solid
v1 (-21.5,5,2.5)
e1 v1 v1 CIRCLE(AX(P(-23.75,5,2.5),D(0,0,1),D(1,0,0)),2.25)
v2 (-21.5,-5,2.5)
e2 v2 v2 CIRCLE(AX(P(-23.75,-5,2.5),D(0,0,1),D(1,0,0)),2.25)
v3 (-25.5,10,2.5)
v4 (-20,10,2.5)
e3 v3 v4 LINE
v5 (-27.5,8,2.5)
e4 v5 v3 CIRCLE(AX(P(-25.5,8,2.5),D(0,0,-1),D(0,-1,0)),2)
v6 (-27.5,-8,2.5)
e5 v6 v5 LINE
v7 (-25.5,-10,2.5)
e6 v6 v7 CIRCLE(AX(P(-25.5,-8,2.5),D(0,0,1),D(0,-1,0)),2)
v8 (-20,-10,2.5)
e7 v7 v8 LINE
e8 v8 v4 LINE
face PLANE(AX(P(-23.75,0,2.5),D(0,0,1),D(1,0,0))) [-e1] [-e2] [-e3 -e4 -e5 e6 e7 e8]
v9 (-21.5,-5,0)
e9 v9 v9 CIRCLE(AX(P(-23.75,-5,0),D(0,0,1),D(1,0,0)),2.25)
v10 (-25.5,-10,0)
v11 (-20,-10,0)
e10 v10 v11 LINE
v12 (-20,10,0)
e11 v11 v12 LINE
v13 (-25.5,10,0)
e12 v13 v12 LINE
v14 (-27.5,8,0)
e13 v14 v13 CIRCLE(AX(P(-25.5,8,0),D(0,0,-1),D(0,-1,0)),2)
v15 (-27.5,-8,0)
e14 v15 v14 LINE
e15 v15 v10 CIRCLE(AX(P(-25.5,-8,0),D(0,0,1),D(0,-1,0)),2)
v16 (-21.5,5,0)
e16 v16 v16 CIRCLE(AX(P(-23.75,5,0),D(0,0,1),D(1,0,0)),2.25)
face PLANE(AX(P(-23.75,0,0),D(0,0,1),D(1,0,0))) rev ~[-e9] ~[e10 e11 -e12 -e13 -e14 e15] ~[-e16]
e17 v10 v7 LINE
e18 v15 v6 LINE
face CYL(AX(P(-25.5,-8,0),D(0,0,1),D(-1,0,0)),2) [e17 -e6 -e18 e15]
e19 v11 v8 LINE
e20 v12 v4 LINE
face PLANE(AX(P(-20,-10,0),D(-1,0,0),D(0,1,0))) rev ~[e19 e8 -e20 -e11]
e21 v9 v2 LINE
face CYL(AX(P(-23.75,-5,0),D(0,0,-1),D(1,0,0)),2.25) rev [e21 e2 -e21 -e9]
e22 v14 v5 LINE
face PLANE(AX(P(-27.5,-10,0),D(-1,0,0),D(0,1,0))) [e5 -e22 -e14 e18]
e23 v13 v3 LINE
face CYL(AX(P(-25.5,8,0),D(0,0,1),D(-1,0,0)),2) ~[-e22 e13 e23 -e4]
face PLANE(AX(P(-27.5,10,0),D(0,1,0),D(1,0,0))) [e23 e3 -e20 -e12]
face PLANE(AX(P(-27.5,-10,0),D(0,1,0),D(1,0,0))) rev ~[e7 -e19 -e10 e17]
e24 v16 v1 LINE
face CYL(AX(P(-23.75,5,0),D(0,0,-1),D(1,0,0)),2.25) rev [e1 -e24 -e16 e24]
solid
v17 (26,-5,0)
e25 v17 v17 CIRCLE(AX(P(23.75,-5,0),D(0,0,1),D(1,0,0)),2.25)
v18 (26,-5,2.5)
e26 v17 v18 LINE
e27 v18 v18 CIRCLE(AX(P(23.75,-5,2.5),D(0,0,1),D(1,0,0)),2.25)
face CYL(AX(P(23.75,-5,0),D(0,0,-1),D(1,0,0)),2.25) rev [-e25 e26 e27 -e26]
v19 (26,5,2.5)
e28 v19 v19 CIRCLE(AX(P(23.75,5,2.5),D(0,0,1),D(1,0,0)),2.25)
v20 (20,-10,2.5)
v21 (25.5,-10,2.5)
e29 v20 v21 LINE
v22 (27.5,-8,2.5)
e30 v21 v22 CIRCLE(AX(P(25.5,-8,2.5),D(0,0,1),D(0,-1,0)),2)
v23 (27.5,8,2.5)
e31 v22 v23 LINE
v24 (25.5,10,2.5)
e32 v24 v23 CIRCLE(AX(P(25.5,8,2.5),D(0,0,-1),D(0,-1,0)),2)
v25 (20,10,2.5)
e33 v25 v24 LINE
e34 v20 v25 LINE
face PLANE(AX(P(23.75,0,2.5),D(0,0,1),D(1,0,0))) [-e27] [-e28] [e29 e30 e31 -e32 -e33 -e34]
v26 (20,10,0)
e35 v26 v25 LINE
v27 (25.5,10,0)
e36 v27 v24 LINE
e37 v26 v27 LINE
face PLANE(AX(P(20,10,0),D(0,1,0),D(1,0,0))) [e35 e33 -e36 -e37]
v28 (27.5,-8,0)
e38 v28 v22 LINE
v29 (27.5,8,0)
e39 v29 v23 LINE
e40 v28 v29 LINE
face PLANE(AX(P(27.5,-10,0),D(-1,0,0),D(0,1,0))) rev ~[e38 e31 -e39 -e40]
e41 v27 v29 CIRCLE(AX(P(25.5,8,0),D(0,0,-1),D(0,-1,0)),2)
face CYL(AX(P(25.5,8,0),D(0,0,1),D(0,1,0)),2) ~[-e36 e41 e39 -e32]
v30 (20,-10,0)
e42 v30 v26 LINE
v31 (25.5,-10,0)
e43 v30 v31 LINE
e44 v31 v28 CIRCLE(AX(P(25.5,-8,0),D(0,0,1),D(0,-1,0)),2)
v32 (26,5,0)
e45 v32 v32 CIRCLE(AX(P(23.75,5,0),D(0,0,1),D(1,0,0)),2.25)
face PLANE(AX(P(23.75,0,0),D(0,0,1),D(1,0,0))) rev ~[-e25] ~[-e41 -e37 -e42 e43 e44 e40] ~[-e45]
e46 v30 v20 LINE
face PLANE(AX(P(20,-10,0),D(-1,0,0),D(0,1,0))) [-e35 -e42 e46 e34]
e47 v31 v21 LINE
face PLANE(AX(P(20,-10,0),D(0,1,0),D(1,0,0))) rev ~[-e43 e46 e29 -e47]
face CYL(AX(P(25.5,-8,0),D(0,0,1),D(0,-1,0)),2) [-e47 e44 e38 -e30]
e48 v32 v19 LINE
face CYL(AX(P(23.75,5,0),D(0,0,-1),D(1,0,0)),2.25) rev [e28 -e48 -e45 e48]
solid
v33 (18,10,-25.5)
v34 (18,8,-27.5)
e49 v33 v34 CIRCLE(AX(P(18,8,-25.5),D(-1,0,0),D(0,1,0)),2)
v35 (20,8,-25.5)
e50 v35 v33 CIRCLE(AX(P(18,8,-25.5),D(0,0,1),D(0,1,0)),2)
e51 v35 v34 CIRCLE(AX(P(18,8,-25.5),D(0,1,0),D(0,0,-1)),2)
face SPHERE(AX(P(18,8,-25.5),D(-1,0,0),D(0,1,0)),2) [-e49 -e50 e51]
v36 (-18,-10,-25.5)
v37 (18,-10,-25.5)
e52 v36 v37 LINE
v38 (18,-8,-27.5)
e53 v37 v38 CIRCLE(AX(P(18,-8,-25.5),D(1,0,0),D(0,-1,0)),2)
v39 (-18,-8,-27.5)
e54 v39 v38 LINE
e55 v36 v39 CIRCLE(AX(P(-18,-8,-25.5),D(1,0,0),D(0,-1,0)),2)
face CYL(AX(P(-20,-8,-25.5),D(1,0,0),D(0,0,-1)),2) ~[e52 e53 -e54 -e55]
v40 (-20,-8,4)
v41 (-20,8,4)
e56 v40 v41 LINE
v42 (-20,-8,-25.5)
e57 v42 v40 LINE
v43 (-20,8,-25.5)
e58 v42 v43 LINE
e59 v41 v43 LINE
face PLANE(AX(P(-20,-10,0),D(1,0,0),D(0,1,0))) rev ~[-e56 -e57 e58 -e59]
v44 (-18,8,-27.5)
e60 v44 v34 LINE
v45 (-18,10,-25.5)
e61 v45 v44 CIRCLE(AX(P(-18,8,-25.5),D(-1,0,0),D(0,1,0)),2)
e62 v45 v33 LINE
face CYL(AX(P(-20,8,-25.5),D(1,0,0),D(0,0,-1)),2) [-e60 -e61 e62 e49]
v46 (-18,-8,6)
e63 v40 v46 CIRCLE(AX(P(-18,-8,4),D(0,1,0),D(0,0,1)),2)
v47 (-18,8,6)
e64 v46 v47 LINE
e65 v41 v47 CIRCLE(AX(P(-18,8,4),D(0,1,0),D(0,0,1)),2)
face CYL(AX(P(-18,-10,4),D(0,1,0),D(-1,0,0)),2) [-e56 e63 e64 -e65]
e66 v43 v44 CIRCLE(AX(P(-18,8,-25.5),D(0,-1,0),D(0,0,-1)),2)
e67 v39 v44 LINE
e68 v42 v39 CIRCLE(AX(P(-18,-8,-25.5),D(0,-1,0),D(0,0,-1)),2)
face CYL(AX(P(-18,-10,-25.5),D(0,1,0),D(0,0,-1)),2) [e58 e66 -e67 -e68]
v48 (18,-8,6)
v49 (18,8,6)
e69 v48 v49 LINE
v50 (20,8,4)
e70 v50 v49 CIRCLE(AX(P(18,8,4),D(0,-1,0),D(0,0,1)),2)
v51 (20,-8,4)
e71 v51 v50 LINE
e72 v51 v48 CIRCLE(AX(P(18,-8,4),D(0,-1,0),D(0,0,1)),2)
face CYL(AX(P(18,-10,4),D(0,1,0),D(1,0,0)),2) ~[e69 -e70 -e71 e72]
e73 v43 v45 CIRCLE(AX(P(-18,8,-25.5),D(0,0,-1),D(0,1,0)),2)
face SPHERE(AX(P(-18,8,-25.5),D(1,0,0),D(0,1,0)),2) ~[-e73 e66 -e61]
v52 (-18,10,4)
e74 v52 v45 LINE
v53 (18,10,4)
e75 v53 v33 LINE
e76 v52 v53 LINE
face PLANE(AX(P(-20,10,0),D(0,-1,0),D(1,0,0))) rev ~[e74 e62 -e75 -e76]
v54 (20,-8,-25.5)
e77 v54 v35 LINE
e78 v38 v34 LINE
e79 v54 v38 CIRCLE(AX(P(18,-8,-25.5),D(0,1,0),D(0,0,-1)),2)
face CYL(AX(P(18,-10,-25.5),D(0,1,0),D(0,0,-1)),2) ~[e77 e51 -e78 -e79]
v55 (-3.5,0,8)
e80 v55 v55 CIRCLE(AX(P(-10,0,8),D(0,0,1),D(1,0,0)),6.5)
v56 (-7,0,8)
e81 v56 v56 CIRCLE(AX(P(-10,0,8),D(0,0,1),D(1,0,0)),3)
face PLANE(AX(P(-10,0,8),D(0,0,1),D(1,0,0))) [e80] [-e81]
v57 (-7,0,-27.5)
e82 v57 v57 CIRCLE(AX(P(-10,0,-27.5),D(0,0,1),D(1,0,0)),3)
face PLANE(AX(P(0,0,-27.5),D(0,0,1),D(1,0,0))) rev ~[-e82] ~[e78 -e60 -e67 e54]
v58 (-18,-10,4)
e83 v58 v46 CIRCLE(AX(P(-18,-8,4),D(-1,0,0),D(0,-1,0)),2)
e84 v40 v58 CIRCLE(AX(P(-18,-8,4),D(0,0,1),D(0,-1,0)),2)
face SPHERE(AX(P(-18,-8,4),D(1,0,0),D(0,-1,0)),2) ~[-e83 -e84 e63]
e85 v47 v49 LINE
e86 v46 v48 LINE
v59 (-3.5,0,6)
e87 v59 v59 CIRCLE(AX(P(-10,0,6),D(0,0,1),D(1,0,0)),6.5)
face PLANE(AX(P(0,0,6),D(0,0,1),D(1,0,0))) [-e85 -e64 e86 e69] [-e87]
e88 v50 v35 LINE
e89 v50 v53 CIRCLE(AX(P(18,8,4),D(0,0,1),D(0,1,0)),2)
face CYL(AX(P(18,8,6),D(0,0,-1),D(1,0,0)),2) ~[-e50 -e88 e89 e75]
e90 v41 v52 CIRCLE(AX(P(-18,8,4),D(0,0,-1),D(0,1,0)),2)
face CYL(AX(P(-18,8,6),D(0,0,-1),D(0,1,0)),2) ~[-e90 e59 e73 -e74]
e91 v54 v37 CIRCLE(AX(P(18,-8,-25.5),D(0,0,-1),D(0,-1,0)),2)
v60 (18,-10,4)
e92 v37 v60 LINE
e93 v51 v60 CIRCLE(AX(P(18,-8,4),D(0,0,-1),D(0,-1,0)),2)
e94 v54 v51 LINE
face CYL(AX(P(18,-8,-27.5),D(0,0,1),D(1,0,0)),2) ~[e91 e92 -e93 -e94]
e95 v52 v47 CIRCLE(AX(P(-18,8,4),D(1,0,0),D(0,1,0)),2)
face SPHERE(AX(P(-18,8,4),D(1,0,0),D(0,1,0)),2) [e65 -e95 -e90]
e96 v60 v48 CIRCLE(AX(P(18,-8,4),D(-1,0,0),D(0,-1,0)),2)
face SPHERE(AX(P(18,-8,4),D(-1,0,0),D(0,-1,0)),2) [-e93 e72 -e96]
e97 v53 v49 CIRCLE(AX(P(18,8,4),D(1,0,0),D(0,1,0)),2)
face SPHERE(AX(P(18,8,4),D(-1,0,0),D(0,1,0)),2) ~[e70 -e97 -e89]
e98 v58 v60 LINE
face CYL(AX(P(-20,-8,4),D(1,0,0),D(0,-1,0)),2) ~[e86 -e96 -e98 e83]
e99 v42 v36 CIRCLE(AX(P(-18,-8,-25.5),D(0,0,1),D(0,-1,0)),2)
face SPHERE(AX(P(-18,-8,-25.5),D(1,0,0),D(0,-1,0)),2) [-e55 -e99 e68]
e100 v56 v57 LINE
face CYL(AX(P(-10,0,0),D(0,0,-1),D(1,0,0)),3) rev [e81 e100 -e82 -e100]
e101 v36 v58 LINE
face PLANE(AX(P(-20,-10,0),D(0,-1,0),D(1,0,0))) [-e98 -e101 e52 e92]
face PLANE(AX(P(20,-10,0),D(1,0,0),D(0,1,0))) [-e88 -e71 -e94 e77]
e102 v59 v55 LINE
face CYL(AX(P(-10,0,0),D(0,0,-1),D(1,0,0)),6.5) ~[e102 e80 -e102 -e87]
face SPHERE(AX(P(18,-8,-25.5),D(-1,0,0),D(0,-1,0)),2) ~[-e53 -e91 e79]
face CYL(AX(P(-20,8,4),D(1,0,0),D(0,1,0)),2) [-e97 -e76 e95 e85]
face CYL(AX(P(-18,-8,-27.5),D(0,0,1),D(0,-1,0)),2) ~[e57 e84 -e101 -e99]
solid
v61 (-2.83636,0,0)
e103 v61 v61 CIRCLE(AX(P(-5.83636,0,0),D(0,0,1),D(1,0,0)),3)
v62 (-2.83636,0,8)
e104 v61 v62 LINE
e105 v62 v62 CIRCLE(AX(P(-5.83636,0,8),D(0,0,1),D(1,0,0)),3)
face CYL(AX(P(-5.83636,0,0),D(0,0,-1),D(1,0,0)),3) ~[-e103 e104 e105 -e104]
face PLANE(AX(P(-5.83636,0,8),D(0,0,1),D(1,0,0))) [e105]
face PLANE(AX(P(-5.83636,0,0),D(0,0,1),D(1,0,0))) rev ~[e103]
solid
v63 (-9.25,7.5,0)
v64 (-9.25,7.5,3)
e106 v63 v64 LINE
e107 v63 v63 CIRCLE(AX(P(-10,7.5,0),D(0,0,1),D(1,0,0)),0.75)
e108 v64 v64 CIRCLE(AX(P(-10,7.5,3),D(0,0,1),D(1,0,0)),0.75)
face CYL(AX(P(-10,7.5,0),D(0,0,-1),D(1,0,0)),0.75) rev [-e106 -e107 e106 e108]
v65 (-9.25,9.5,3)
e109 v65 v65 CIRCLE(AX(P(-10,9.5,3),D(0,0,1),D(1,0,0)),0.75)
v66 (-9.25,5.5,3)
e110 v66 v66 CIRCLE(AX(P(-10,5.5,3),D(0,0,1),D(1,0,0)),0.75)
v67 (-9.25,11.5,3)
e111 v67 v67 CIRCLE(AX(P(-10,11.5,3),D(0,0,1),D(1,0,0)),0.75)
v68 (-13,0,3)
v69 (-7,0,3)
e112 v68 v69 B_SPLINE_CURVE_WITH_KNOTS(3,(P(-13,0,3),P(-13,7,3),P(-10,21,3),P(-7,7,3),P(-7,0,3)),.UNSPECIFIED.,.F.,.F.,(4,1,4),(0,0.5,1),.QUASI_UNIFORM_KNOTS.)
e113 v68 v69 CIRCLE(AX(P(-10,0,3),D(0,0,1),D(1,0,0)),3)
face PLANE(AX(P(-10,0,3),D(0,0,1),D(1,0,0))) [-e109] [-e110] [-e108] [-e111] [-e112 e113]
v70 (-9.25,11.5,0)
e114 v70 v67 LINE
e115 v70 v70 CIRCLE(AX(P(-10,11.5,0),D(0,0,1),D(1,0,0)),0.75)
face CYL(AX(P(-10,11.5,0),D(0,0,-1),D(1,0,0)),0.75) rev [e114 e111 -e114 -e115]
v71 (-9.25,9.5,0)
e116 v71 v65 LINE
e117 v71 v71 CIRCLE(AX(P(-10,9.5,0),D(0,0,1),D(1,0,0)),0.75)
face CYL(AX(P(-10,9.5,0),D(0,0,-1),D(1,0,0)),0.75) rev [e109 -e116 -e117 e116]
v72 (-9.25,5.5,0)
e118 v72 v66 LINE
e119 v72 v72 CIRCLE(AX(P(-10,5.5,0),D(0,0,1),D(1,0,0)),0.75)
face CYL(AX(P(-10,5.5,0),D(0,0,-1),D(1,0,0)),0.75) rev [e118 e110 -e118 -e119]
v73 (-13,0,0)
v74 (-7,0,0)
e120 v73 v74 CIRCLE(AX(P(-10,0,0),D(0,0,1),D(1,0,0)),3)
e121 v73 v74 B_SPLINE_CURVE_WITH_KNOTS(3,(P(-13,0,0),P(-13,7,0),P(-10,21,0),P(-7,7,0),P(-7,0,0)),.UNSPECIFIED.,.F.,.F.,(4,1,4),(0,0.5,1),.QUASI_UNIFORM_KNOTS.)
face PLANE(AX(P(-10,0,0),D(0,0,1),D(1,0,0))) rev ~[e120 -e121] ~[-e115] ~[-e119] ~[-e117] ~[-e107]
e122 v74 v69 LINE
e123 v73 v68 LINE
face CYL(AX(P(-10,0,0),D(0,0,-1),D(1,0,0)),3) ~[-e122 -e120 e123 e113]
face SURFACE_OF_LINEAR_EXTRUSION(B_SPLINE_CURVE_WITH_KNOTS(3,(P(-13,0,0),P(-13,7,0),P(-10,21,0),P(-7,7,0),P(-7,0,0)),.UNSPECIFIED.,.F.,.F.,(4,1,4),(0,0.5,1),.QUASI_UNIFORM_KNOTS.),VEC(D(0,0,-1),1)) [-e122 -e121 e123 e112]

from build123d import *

# Parameters (mm, degrees)
F0_W      = 7.5
F0_H      = 20
F0_R      = 2.25
F1_DEPTH  = 2.5
F0_W_2    = 40
F0_R_2    = 6.5
F2_DEPTH  = 6
F0_R_3    = 3
F3_DEPTH  = 27.5
F4_DEPTH  = 8
F5_R      = 2
F5_2_R    = 2
F5_3_R    = 2
F7_R      = 0.75
F8_DEPTH  = 3
F9_DEPTH  = 3
F11_R     = 3
F12_DEPTH = 8


# Not quite as in the source:
# - a feature of the source that left no trace in its solid (it failed there, or was rolled back) is left out


with BuildPart() as f1:
    # F0 (on Top) → F1 (new body)
    with BuildSketch(Plane.XY):
        with Locations((23.75, 0)):
            Rectangle(F0_W, F0_H)
        with Locations((23.75, -5)):
            Circle(F0_R, mode=Mode.SUBTRACT)
        with Locations((23.75, 5)):
            Circle(F0_R, mode=Mode.SUBTRACT)
    extrude(amount=F1_DEPTH)

    # F5
    f5_edges = [f1.edges().sort_by_distance(p)[0] for p in [
        (27.5, -10, 1.25),
        (27.5, 10, 1.25),
    ]]
    fillet(f5_edges, radius=F5_R)


with BuildPart() as f1b:
    # F0 (on Top) → F1, piece 2 (new body)
    with BuildSketch(Plane.XY):
        with Locations((-23.75, 0)):
            Rectangle(F0_W, F0_H)
        with Locations((-23.75, -5)):
            Circle(F0_R, mode=Mode.SUBTRACT)
        with Locations((-23.75, 5)):
            Circle(F0_R, mode=Mode.SUBTRACT)
    extrude(amount=F1_DEPTH)

    # F5#2
    f5_2_edges = [f1b.edges().sort_by_distance(p)[0] for p in [
        (-27.5, -10, 1.25),
        (-27.5, 10, 1.25),
    ]]
    fillet(f5_2_edges, radius=F5_2_R)


with BuildPart() as f2:
    # F0 (on Top) → F2 (new body)
    with BuildSketch(Plane.XY):
        Rectangle(F0_W_2, F0_H)
        with Locations((-10, 0)):
            Circle(F0_R_2, mode=Mode.SUBTRACT)
    extrude(amount=F2_DEPTH)

    # F0 (on Top) → F3 (join)
    with BuildSketch(Plane.XY):
        Rectangle(F0_W_2, F0_H)
        with Locations((-10, 0)):
            Circle(F0_R_2, mode=Mode.SUBTRACT)
        with Locations((-10, 0)):
            Circle(F0_R_2)
        with Locations((-10, 0)):
            Circle(F0_R_3, mode=Mode.SUBTRACT)
    extrude(amount=-F3_DEPTH)

    # F0 (on Top) → F4 (join)
    with BuildSketch(Plane.XY):
        with Locations((-10, 0)):
            Circle(F0_R_2)
        with Locations((-10, 0)):
            Circle(F0_R_3, mode=Mode.SUBTRACT)
    extrude(amount=F4_DEPTH)

    # F5#3
    f5_3_edges = [f2.edges().sort_by_distance(p)[0] for p in [
        (0, -10, 6),
        (0, 10, 6),
        (0, 10, -27.5),
        (0, -10, -27.5),
        (-20, 10, -10.75),
        (-20, -10, -10.75),
        (20, -10, -10.75),
        (20, 10, -10.75),
        (20, 0, -27.5),
        (20, 0, 6),
        (-20, 0, 6),
        (-20, 0, -27.5),
    ]]
    fillet(f5_3_edges, radius=F5_3_R)


with BuildPart() as f8:
    # F7 (on Top) → F8 (new body)
    with BuildSketch(Plane.XY):
        with BuildLine():
            ThreePointArc((-13, 0), (-10, -3), (-7, 0))
            ThreePointArc((-7, 0), (-10, 3), (-13, 0))
        make_face()
        with BuildLine():
            ThreePointArc((-13, 0), (-10, 3), (-7, 0))
            add(Edge.make_bspline(
                [(-13, 0), (-13, 7), (-10, 21), (-7, 7), (-7, 0)],
                knots=[0, 0, 0, 0, 0.5, 1, 1, 1, 1], degree=3))
        make_face()
        with Locations((-10, 5.5)):
            Circle(F7_R, mode=Mode.SUBTRACT)
        with Locations((-10, 7.5)):
            Circle(F7_R, mode=Mode.SUBTRACT)
        with Locations((-10, 9.5)):
            Circle(F7_R, mode=Mode.SUBTRACT)
        with Locations((-10, 11.5)):
            Circle(F7_R, mode=Mode.SUBTRACT)
    extrude(amount=F8_DEPTH)


with BuildPart() as f9:
    # F7 (on Top) → F9 (new body)
    with BuildSketch(Plane.XY):
        with BuildLine():
            ThreePointArc((-13, 0), (-10, -3), (-7, 0))
            ThreePointArc((-7, 0), (-10, 3), (-13, 0))
        make_face()
        with BuildLine():
            ThreePointArc((-13, 0), (-10, 3), (-7, 0))
            add(Edge.make_bspline(
                [(-13, 0), (-13, 7), (-10, 21), (-7, 7), (-7, 0)],
                knots=[0, 0, 0, 0, 0.5, 1, 1, 1, 1], degree=3))
        make_face()
        with Locations((-10, 5.5)):
            Circle(F7_R, mode=Mode.SUBTRACT)
        with Locations((-10, 7.5)):
            Circle(F7_R, mode=Mode.SUBTRACT)
        with Locations((-10, 9.5)):
            Circle(F7_R, mode=Mode.SUBTRACT)
        with Locations((-10, 11.5)):
            Circle(F7_R, mode=Mode.SUBTRACT)
    extrude(amount=F9_DEPTH)


with BuildPart() as f12:
    # F11 (on Top) → F12 (new body)
    with BuildSketch(Plane.XY):
        with Locations((-5.8363600008, 0)):
            Circle(F11_R)
    extrude(amount=F12_DEPTH)


solid = Compound([f1.part, f1b.part, f2.part, f8.part, f12.part])
